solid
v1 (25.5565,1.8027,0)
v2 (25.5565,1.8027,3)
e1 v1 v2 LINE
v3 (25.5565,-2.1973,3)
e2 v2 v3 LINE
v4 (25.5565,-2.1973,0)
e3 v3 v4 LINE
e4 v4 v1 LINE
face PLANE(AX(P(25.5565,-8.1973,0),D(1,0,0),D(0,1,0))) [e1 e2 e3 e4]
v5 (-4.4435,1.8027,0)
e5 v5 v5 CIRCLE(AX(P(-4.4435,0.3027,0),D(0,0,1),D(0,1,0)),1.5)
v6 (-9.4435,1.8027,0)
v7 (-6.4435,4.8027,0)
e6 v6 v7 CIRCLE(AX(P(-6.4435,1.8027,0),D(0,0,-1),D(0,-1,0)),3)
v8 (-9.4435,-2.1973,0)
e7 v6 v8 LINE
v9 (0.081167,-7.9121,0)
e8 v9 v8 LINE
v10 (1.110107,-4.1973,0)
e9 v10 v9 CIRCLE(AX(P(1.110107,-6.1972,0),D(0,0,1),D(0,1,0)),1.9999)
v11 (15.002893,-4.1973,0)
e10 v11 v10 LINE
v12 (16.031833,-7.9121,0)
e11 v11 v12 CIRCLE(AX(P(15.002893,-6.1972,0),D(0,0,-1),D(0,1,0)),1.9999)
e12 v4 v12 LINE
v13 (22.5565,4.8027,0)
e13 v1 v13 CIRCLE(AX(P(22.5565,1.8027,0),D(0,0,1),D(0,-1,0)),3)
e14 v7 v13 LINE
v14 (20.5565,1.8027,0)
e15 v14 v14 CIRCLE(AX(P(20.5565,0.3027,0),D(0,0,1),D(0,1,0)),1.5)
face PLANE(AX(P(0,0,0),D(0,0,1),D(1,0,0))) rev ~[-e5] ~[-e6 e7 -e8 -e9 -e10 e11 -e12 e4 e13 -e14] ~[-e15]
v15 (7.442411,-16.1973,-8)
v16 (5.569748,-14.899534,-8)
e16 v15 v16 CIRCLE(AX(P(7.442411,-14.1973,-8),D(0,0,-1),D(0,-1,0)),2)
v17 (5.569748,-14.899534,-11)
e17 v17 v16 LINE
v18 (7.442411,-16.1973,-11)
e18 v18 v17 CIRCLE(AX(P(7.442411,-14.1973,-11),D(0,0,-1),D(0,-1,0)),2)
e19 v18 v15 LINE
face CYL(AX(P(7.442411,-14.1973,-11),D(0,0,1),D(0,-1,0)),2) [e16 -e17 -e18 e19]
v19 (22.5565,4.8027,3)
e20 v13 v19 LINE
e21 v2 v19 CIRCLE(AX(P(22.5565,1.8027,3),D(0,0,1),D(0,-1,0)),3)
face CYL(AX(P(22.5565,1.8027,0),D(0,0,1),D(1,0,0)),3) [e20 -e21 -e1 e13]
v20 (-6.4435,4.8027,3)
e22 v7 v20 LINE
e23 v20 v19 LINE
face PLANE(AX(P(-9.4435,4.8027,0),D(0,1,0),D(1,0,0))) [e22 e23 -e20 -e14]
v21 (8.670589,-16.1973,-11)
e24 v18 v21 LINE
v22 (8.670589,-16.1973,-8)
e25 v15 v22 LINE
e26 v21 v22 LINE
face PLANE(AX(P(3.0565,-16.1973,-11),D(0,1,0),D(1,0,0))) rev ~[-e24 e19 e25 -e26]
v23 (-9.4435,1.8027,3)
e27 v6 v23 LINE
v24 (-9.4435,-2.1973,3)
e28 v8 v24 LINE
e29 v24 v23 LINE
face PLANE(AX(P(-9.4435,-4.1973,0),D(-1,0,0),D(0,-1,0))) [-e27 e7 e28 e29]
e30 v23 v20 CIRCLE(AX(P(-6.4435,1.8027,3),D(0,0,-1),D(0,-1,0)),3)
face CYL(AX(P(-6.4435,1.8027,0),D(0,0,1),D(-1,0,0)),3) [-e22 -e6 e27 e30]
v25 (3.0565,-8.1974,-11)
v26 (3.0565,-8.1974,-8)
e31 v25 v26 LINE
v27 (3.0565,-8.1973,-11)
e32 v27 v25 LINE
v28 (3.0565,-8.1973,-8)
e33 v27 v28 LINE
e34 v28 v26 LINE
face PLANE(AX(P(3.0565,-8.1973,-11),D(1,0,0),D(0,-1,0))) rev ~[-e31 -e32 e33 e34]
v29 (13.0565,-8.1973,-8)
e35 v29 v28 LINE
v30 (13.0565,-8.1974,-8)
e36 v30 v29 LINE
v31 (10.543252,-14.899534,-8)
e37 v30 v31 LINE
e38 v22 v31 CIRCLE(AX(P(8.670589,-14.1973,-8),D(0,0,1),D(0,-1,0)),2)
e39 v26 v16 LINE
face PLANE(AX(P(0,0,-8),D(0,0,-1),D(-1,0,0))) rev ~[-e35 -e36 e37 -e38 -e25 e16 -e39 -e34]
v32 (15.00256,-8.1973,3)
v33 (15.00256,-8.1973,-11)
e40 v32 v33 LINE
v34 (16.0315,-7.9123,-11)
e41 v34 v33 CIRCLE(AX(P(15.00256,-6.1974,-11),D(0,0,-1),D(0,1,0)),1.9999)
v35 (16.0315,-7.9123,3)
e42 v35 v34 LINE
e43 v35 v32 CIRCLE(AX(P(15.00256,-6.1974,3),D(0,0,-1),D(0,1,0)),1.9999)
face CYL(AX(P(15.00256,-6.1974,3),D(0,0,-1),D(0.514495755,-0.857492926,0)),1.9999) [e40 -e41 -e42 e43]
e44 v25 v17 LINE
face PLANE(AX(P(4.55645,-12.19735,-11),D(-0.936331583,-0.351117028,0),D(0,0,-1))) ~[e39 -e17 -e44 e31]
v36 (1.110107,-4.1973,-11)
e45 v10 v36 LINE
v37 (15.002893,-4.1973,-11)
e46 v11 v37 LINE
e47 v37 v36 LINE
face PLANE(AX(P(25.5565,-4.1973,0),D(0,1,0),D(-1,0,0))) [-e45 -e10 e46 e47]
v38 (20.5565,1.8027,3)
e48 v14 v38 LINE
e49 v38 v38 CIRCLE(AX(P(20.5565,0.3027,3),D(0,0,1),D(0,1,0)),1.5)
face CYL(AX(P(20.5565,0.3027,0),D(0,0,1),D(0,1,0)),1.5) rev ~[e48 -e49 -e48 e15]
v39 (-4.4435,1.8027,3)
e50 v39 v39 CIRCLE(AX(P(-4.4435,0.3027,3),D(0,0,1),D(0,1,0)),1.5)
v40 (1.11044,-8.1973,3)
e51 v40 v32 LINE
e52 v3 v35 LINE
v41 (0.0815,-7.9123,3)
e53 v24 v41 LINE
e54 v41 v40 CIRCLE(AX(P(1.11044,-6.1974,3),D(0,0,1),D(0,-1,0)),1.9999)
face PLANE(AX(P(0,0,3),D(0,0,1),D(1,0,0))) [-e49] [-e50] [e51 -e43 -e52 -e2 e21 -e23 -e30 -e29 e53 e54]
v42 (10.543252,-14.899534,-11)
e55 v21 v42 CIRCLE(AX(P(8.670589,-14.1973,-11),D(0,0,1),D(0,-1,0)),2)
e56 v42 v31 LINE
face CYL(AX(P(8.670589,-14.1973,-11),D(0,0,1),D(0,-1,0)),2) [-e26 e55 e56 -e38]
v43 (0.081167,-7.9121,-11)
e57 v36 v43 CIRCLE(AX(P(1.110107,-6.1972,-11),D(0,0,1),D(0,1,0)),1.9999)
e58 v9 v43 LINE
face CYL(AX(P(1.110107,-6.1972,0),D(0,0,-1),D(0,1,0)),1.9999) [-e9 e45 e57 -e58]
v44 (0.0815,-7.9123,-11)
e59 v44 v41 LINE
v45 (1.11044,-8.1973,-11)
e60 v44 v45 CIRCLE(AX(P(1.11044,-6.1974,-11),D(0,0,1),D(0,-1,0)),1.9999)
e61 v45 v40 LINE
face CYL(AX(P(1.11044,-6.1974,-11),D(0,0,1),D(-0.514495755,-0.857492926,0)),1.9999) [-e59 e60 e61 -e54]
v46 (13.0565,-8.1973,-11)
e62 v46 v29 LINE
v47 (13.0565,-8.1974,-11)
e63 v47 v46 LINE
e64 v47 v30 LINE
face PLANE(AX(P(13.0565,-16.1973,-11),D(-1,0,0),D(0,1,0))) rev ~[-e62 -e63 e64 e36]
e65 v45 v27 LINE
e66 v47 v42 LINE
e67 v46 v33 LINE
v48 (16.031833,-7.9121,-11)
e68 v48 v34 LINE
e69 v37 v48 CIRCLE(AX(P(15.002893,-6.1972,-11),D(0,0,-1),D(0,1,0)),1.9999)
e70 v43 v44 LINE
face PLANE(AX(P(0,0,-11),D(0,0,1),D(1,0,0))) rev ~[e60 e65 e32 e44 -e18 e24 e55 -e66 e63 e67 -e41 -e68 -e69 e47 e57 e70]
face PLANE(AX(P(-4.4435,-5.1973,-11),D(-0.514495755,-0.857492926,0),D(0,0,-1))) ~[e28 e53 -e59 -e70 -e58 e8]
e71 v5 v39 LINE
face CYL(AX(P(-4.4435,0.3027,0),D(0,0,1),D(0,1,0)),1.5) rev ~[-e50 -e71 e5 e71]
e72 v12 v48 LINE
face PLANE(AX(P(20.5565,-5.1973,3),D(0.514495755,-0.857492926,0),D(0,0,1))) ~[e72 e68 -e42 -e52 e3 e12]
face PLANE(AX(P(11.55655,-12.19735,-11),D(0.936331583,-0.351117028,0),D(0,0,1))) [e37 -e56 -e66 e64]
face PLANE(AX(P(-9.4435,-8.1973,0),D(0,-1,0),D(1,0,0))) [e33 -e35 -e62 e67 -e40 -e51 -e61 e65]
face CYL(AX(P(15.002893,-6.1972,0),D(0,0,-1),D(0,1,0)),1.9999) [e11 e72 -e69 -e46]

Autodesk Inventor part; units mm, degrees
ref_plane "YZ Plane" through (0, 0, 0) normal (1, 0, 0) x (0, 1, 0)
ref_plane "XZ Plane" through (0, 0, 0) normal (0, 1, 0) x (-1, 0, 0)
ref_plane "XY Plane" through (0, 0, 0) normal (0, 0, 1) x (1, 0, 0)
sketch "Sketch1" plane through (0, 0, 0) normal (0, 0, 1) x (1, 0, 0)
  line L0 (-9.4435, 4.8027) -> (25.5565, 4.8027)
  line L1 (25.5565, 4.8027) -> (25.5565, -4.1973)
  line L2 (25.5565, -4.1973) -> (-9.4435, -4.1973)
  line L3 (-9.4435, -4.1973) -> (-9.4435, 4.8027)
  line L4 (-9.4435, -4.1973) -> (-9.4435, -8.1973)
  line L5 (-9.4435, -8.1973) -> (25.5565, -8.1973)
  line L6 (25.5565, -8.1973) -> (25.5565, -4.1973)
  point P0 (0, 0)
  point P1 (-4.4435, 0.3027)
  point P2 (20.5565, 0.3027)
  dimension "d0" = 35
  dimension "d1" = 9
  dimension "d2" = 25
  dimension "d3" = 5
  dimension "d4" = 4.5
  dimension "d5" = 4
extrude "Extrusion1" add sketch "Sketch1" along normal blind 3
extrude "Extrusion2" add sketch "Sketch1" against normal blind 11 contours L2 L6 L5 L4
hole "Hole1" at (-4.4435, 0.3027, 0) at (20.5565, 0.3027, 0) direction (0, 0, 1) diameter 3 end through all
fillet "Fillet1" radius 3 2 edges at (-9.4435, 4.8027, 1.5) (25.5565, 4.8027, 1.5)
chamfer "Chamfer1" distance 6 distance2 10 1 edges at (-9.4435, -8.1973, -4) measured on face at (-9.4435, -6.8639, -2.6667)
chamfer "Chamfer2" distance 6 distance2 10 1 edges at (25.5565, -8.1973, -4) measured on face at (25.5565, -6.8639, -2.6667)
fillet "Fillet2" radius 2 4 edges at (22.2232, -4.1973, -5.5) (-6.1102, -4.1973, -5.5) (0.5565, -8.1973, -4) (15.5565, -8.1973, -4)
sketch "Sketch2" plane through (0, 0, -11) normal (0, 0, -1) x (-1, 0, 0)
  arc A0 (-15.0025, -4.1973) -> (-15.0025, -8.1973) centre (-15.0025, -6.1973) ccw projected
  line L0 (-15.0025, -8.1973) -> (-1.1105, -8.1973) projected
  arc A1 (-1.1105, -8.1973) -> (-1.1105, -4.1973) centre (-1.1105, -6.1973) ccw projected
  line L1 (-1.1105, -4.1973) -> (-15.0025, -4.1973) projected
  line L2 (-15.0025, -8.1973) -> (-1.1105, -8.1973) projected
  line L3 (-3.0565, -8.1973) -> (-3.0565, -16.1973)
  line L4 (-3.0565, -16.1973) -> (-13.0565, -16.1973)
  line L5 (-13.0565, -16.1973) -> (-13.0565, -8.1973)
  point P0 (0, 0)
  dimension "d25" = 8
  dimension "d26" = 10
  dimension "d27" = 13.8921
  dimension "d28" = 1.946
extrude "Extrusion3" add sketch "Sketch2" against normal blind 3 contours L0 L3 L4 L5
chamfer "Chamfer3" distance 8 distance2 3 1 edges at (3.0565, -16.1973, -9.5) measured on face at (3.0565, -13.5306, -10)
chamfer "Chamfer4" distance 8 distance2 3 1 edges at (13.0565, -16.1973, -9.5) measured on face at (13.0565, -10.8639, -10)
fillet "Fillet3" radius 2 2 edges at (10.0566, -16.1973, -9.5) (6.0564, -16.1973, -9.5)
equation "\"d1\" = 2 * d4"
equation "\"d28\" = -0.5 * d26 + 0.5 * d27"
properties part number "3DP_PLA_Y_axis_endstop_pushrod" material "ABS Plastic"
